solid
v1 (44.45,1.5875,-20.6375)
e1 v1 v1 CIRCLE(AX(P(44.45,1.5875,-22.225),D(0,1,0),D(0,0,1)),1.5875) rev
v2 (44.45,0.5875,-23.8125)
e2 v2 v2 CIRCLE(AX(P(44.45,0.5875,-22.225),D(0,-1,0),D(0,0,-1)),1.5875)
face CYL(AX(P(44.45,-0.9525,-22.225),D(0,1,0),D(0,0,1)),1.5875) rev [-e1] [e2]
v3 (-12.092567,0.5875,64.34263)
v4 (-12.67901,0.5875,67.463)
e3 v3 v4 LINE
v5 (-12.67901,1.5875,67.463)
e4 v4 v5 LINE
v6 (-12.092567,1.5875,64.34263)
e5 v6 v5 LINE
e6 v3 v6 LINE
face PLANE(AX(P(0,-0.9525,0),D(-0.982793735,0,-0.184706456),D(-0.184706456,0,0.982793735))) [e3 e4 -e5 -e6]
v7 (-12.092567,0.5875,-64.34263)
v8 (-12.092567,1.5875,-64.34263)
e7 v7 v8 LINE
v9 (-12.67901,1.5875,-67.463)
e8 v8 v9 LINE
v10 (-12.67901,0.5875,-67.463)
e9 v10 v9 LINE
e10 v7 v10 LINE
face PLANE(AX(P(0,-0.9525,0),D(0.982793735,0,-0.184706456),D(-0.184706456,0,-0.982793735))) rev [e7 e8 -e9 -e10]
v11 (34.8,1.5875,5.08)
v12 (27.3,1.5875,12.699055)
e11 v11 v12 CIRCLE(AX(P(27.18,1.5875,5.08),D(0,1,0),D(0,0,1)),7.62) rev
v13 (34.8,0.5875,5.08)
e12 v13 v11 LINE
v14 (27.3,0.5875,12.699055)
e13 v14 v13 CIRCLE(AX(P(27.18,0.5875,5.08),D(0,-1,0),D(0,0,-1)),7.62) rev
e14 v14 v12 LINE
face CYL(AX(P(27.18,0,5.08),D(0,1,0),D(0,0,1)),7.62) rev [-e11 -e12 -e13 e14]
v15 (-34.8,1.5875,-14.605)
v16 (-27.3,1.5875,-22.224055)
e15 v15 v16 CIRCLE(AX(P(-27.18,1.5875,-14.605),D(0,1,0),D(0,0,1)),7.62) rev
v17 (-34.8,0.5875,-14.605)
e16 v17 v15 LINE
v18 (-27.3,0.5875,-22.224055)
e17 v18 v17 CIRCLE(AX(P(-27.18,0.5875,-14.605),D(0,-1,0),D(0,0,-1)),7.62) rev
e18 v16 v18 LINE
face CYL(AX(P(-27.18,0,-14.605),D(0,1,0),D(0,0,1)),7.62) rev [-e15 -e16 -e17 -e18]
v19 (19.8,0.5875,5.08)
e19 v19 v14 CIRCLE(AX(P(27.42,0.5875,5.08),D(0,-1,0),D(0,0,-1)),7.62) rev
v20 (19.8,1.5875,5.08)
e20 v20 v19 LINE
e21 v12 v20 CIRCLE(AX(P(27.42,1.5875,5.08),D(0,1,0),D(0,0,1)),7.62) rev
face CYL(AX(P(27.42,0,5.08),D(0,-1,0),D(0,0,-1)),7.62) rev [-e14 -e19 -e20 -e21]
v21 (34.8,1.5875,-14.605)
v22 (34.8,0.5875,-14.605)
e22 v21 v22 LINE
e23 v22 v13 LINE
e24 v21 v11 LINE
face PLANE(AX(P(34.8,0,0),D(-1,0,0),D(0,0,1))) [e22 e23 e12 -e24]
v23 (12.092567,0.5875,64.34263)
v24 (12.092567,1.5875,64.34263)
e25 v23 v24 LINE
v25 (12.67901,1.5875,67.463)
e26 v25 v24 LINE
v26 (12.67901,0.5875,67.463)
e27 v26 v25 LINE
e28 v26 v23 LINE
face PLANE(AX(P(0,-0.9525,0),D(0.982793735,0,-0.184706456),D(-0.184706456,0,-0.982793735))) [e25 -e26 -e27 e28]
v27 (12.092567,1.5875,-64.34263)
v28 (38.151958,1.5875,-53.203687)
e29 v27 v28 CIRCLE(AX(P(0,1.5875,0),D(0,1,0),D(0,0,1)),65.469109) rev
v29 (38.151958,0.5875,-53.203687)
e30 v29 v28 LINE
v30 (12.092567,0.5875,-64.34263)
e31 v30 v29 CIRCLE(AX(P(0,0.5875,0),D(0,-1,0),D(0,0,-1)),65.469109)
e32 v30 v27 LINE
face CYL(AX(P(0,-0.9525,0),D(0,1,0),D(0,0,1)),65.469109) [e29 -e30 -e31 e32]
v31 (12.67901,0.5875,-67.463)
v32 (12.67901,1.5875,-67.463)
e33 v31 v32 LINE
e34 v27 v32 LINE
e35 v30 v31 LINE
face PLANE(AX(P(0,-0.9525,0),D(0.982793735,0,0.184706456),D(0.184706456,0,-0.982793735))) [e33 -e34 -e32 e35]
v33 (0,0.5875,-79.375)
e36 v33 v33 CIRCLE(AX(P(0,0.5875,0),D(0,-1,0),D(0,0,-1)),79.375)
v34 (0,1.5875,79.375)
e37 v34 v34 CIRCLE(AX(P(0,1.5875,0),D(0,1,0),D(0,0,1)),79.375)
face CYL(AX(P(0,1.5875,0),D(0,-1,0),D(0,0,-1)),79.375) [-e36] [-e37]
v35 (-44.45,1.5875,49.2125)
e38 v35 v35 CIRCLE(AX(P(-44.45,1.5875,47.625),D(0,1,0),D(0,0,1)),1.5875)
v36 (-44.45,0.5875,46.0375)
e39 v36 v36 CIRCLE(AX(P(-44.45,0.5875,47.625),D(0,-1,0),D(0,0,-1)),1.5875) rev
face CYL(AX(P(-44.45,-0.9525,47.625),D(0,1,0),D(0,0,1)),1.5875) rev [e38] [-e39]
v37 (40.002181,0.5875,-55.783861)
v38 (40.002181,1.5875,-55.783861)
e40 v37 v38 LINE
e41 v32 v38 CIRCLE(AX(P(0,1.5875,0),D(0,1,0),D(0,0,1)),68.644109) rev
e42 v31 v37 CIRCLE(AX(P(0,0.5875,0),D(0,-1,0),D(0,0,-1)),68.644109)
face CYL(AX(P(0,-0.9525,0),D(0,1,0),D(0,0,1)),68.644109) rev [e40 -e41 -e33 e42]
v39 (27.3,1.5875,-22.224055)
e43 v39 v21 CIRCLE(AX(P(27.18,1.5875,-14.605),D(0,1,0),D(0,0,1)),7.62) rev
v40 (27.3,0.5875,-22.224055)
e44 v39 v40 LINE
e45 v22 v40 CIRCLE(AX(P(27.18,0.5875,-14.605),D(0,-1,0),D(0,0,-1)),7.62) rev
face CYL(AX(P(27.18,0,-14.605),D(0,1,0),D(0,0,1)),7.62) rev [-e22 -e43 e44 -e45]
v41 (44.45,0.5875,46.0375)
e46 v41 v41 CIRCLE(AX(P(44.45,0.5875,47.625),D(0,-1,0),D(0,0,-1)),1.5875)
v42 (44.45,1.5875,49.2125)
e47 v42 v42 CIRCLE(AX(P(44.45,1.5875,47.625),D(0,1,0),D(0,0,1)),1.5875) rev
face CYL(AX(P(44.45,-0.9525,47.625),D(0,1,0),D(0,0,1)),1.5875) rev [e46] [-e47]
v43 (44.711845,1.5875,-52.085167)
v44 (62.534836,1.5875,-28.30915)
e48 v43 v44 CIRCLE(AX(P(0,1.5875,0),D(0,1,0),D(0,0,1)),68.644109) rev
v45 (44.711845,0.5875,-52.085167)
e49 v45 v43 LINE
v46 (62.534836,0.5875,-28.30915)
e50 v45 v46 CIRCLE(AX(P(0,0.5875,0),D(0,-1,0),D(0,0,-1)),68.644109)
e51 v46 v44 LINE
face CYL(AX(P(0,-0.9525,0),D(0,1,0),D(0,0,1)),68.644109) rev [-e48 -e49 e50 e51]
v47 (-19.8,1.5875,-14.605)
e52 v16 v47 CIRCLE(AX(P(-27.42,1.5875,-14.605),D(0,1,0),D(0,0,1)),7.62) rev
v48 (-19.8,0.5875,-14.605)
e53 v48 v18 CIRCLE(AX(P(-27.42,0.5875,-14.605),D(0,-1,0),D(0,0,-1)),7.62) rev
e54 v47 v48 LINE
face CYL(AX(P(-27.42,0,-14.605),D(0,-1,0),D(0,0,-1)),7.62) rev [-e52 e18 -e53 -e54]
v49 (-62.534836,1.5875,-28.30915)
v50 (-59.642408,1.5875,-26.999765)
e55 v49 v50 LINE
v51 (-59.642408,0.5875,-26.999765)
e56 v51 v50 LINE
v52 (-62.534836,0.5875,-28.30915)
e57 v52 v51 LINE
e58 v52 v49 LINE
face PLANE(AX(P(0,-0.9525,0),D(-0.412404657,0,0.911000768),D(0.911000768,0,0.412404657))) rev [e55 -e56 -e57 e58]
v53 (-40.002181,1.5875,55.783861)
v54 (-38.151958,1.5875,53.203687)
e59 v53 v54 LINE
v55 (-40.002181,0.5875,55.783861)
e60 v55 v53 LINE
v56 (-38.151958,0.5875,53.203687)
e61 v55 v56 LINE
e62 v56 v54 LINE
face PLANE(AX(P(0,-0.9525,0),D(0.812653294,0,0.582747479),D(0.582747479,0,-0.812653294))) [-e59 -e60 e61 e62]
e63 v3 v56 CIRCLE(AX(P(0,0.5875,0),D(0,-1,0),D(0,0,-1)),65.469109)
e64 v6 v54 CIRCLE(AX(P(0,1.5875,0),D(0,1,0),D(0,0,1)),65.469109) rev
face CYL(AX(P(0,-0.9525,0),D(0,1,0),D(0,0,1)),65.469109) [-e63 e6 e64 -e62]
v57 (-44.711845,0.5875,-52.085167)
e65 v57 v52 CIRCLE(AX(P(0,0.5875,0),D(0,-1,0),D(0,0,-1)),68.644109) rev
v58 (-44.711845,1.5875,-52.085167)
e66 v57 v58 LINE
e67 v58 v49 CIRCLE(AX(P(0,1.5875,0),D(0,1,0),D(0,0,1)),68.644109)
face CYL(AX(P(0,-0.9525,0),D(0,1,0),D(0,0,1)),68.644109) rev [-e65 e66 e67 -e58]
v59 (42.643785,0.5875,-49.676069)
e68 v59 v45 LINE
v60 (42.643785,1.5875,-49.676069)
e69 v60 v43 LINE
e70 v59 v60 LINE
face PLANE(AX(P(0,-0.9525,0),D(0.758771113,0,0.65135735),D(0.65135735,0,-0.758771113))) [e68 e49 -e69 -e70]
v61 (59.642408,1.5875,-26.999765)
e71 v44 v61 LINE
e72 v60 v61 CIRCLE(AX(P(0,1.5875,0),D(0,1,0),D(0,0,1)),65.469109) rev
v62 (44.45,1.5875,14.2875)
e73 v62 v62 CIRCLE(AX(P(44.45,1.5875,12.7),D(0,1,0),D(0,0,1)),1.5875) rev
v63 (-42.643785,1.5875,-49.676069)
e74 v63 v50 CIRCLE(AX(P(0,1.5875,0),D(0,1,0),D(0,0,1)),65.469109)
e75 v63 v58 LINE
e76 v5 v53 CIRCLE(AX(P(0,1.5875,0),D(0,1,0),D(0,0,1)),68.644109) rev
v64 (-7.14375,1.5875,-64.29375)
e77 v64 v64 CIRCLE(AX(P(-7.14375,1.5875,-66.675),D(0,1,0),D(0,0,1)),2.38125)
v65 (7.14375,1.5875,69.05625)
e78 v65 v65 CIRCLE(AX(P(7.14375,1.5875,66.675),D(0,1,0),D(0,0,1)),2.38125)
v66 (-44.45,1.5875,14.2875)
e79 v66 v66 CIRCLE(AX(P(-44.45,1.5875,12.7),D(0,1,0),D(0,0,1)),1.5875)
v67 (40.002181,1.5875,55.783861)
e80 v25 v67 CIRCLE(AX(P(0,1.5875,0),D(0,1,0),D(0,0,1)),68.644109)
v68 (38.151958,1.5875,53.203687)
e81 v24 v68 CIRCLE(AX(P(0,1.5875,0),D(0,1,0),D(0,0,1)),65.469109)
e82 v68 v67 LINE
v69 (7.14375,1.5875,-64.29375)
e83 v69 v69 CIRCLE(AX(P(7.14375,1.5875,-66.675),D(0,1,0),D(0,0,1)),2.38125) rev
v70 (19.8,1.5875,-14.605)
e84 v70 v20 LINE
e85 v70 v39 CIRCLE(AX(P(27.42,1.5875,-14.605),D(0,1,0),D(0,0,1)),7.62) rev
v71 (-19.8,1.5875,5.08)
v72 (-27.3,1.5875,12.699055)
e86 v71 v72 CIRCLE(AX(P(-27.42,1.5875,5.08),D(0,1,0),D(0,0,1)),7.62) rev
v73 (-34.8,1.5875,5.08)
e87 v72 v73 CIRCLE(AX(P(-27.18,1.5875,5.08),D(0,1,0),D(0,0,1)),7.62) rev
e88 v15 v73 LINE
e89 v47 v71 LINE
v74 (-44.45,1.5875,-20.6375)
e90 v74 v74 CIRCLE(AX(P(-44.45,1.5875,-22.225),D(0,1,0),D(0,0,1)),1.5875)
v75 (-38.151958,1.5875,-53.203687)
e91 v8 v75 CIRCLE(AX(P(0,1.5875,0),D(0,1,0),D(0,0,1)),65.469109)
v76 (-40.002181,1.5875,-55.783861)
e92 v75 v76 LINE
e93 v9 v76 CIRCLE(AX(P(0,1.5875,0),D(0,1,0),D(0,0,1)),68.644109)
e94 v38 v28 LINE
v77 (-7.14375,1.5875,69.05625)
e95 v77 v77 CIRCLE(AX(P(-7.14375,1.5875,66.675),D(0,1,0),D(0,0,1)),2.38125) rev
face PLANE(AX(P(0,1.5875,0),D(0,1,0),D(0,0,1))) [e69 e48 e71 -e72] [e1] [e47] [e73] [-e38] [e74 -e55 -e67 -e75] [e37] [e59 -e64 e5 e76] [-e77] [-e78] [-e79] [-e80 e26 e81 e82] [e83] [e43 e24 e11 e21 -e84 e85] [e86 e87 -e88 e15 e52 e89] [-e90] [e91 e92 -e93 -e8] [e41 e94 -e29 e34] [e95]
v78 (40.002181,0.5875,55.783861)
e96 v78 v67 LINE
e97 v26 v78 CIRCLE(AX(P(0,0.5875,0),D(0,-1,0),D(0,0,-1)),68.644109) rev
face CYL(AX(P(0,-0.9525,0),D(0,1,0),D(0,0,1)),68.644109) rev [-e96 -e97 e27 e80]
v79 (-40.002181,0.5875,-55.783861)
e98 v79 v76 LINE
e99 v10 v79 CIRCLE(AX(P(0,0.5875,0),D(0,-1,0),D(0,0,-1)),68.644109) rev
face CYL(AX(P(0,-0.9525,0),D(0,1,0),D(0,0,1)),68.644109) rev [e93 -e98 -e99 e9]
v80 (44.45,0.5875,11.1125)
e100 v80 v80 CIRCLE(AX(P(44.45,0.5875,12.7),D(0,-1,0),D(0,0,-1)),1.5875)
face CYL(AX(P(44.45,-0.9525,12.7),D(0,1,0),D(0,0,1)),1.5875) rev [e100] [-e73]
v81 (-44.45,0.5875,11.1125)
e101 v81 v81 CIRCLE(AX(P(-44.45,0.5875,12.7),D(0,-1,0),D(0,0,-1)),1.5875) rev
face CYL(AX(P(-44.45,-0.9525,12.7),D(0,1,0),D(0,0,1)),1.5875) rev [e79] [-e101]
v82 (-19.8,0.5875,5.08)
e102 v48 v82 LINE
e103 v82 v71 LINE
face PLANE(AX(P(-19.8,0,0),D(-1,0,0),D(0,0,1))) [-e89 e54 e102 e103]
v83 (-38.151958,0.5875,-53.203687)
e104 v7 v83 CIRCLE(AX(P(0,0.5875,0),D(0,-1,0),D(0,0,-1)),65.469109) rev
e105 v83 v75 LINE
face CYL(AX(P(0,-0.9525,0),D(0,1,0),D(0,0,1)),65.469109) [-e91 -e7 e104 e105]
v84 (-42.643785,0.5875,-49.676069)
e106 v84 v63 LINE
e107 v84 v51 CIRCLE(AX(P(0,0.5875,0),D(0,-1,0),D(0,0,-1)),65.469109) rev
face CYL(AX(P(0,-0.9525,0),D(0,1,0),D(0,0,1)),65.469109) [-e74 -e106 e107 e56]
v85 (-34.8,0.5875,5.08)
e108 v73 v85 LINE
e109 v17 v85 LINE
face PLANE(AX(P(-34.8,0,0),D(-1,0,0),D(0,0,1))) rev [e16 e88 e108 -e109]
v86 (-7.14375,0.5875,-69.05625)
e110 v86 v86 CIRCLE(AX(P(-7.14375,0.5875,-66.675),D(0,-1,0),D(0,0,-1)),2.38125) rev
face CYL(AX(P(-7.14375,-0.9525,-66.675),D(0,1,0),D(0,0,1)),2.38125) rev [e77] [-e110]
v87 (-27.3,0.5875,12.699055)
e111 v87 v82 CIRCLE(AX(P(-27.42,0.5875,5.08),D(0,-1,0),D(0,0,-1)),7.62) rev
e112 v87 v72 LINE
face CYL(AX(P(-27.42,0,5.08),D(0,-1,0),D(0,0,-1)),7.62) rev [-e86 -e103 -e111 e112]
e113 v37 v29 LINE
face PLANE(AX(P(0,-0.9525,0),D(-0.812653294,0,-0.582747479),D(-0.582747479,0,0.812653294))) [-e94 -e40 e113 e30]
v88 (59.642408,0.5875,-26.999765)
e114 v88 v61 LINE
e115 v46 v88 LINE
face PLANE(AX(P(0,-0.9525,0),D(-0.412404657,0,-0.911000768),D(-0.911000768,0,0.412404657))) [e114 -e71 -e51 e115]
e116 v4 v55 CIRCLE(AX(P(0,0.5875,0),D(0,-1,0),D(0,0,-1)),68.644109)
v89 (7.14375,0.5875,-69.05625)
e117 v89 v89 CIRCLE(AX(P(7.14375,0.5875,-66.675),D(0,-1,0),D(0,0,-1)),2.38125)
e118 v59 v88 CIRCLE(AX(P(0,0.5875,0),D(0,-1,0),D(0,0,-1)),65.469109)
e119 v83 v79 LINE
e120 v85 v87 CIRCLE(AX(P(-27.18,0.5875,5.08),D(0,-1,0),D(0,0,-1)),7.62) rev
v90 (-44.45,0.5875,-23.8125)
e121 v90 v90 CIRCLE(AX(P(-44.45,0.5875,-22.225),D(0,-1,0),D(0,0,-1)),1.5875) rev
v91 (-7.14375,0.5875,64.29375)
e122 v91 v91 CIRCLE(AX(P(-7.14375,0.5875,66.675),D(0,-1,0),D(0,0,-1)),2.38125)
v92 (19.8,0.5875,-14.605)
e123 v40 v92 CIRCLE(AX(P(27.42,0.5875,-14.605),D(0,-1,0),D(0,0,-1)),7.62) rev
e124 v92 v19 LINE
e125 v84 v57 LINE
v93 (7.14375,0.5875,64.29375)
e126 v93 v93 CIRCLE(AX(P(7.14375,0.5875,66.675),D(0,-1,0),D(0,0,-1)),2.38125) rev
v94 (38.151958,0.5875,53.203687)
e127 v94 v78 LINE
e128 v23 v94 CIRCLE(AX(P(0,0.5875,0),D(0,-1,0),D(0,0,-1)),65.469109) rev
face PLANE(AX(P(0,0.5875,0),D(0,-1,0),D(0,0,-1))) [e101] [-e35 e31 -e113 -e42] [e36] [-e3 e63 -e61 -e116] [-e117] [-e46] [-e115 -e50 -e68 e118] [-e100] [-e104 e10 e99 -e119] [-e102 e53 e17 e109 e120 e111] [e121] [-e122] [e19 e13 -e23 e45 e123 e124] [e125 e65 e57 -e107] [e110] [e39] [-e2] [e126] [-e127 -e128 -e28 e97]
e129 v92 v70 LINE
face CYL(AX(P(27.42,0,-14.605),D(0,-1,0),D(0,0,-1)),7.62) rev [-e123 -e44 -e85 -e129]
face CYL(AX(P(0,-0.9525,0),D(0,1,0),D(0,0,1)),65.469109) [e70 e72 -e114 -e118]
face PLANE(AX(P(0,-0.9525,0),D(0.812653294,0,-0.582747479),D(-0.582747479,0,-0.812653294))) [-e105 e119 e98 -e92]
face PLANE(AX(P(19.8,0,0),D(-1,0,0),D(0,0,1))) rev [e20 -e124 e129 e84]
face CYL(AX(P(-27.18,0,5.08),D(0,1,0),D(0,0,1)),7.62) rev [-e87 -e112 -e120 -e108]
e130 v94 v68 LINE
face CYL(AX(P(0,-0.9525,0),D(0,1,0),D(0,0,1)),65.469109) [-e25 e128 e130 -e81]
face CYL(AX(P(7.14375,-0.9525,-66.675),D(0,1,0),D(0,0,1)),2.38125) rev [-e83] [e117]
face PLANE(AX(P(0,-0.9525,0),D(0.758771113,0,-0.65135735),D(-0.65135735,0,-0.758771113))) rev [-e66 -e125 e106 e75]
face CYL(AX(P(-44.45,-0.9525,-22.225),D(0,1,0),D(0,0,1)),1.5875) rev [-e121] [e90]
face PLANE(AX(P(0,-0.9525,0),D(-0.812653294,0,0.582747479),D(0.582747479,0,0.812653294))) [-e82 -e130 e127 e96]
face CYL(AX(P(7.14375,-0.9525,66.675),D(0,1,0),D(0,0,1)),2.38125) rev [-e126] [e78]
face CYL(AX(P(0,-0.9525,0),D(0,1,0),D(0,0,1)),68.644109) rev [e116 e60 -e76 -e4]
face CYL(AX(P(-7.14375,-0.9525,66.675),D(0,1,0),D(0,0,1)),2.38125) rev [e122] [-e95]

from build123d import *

# Parameters (mm, degrees)
SKETCH1_R           = 1.5875
BOSS_EXTRUDE5_DEPTH = 1.5875
FILLET2_R           = 2.54
FILLET3_R           = 2.54
FILLET4_R           = 5.08
CUT_EXTRUDE1_START  = -2.54
SKETCH2_R           = 2.38125
SKETCH2_R_2         = 1.5875
CUT_EXTRUDE1_DEPTH  = 2.54
SKETCH3_R           = 1.5875
CUT_EXTRUDE2_DEPTH  = 2.54
CUT_EXTRUDE3_DEPTH  = 2.54
SKETCH5_W           = 15
SKETCH5_H           = 34.925
CUT_EXTRUDE4_DEPTH  = 109.650407999
FILLET5_R           = 7.62
FILLET6_R           = 7.62
BOSS_EXTRUDE6_START = -1.5875
BOSS_EXTRUDE6_DEPTH = 1.5875
SKETCH7_R           = 79.375
CUT_EXTRUDE5_DEPTH  = 0.5875


with BuildPart() as part:
    # Sketch1 → Boss-Extrude5 (new body)
    with BuildSketch(Plane(origin=(0, 0, 0), x_dir=(1, 0, 0), z_dir=(0, 1, 0))):
        with BuildLine():
            ThreePointArc((-63.5, -47.625), (-35.497579143, -70.995158286), (0, -79.375))
            ThreePointArc((0, -79.375), (35.497579143, -70.995158286), (63.5, -47.625))
            Line((63.5, -47.625), (50.8, -47.625))
            Line((50.8, -47.625), (50.8, 22.225))
            Line((50.8, 22.225), (76.2, 22.225))
            ThreePointArc((76.2, 22.225), (0, 79.375), (-76.2, 22.225))
            Line((-76.2, 22.225), (-50.8, 22.225))
            Line((-50.8, 22.225), (-50.8, -47.625))
            Line((-50.8, -47.625), (-63.5, -47.625))
        make_face()
        with Locations(Location((-7.14375, -66.675, 0), (0, 0, 270))):
            Circle(SKETCH1_R, mode=Mode.SUBTRACT)
        with BuildLine():
            ThreePointArc((8.73125, -66.675), (7.14375, -68.2625), (5.55625, -66.675))
            ThreePointArc((5.55625, -66.675), (7.14375, -65.0875), (8.73125, -66.675))
        make_face(mode=Mode.SUBTRACT)
        with Locations(Location((-7.14375, 66.675, 0), (0, 0, 270))):
            Circle(SKETCH1_R, mode=Mode.SUBTRACT)
        with Locations(Location((7.14375, 66.675, 0), (0, 0, 270))):
            Circle(SKETCH1_R, mode=Mode.SUBTRACT)
    extrude(amount=BOSS_EXTRUDE5_DEPTH)

    # Fillet2
    fillet2_edges = [part.edges().sort_by_distance(p)[0] for p in [
        (-63.5, 0.79375, 47.625),
    ]]
    fillet(fillet2_edges, radius=FILLET2_R)

    # Fillet3
    fillet3_edges = [part.edges().sort_by_distance(p)[0] for p in [
        (63.5, 0.79375, 47.625),
    ]]
    fillet(fillet3_edges, radius=FILLET3_R)

    # Fillet4
    fillet4_edges = [part.edges().sort_by_distance(p)[0] for p in [
        (-76.2, 0.79375, -22.225),
        (76.2, 0.79375, -22.225),
    ]]
    fillet(fillet4_edges, radius=FILLET4_R)

    # Sketch2 → Cut-Extrude1 (cut)
    # profile 1 of 10: a face of its own
    with BuildSketch(Plane(origin=(0, 1.5875, 0), x_dir=(1, 0, 0), z_dir=(0, 1, 0)).offset(CUT_EXTRUDE1_START)):
        with BuildLine():
            Line((-61.088622125, 27.654457796), (-59.642408406, 26.999765402))
            ThreePointArc((-59.642408406, 26.999765402), (-52.384826382, 39.268743005), (-42.643785254, 49.676068599))
            Line((-42.643785254, 49.676068599), (-43.677815048, 50.880617741))
            Line((-43.677815048, 50.880617741), (-44.711844841, 52.085166883))
            ThreePointArc((-44.711844841, 52.085166883), (-54.925289002, 41.173126022), (-62.534835843, 28.309150189))
            Line((-62.534835843, 28.309150189), (-61.088622125, 27.654457796))
        make_face()
    # profile 2 of 10: a face of its own
    with BuildSketch(Plane(origin=(0, 1.5875, 0), x_dir=(1, 0, 0), z_dir=(0, 1, 0)).offset(CUT_EXTRUDE1_START)):
        with BuildLine():
            Line((-39.077069744, 54.493774041), (-38.151958122, 53.203686937))
            ThreePointArc((-38.151958122, 53.203686937), (-25.732218917, 60.200142208), (-12.092567045, 64.342629994))
            Line((-12.092567045, 64.342629994), (-12.385788543, 65.902815048))
            Line((-12.385788543, 65.902815048), (-12.679010041, 67.463000102))
            ThreePointArc((-12.679010041, 67.463000102), (-26.980132574, 63.119617589), (-40.002181367, 55.783861145))
            Line((-40.002181367, 55.783861145), (-39.077069744, 54.493774041))
        make_face()
    # profile 3 of 10: a face of its own
    with BuildSketch(Plane(origin=(0, 1.5875, 0), x_dir=(1, 0, 0), z_dir=(0, 1, 0)).offset(CUT_EXTRUDE1_START)):
        with Locations(Location((-7.14375, 66.675, 0), (0, 0, 270))):
            Circle(SKETCH2_R)
        with Locations((-7.14375, 66.675)):
            Circle(SKETCH2_R_2, mode=Mode.SUBTRACT)
    # profile 4 of 10: a face of its own
    with BuildSketch(Plane(origin=(0, 1.5875, 0), x_dir=(1, 0, 0), z_dir=(0, 1, 0)).offset(CUT_EXTRUDE1_START)):
        with Locations(Location((7.14375, 66.675, 0), (0, 0, 270))):
            Circle(SKETCH2_R)
        with Locations((7.14375, 66.675)):
            Circle(SKETCH2_R_2, mode=Mode.SUBTRACT)
    # profile 5 of 10: a face of its own
    with BuildSketch(Plane(origin=(0, 1.5875, 0), x_dir=(1, 0, 0), z_dir=(0, 1, 0)).offset(CUT_EXTRUDE1_START)):
        with BuildLine():
            ThreePointArc((12.679010041, 67.463000102), (26.980132574, 63.119617589), (40.002181367, 55.783861145))
            Line((40.002181367, 55.783861145), (39.077069744, 54.493774041))
            Line((39.077069744, 54.493774041), (38.151958122, 53.203686937))
            ThreePointArc((38.151958122, 53.203686937), (25.732218917, 60.200142208), (12.092567045, 64.342629994))
            Line((12.092567045, 64.342629994), (12.385788543, 65.902815048))
            Line((12.385788543, 65.902815048), (12.679010041, 67.463000102))
        make_face()
    # profile 6 of 10: a face of its own
    with BuildSketch(Plane(origin=(0, 1.5875, 0), x_dir=(1, 0, 0), z_dir=(0, 1, 0)).offset(CUT_EXTRUDE1_START)):
        with BuildLine():
            ThreePointArc((44.711844841, 52.085166883), (54.925289002, 41.173126022), (62.534835843, 28.309150189))
            Line((62.534835843, 28.309150189), (59.642408406, 26.999765402))
            ThreePointArc((59.642408406, 26.999765402), (52.384826382, 39.268743005), (42.643785254, 49.676068599))
            Line((42.643785254, 49.676068599), (43.677815048, 50.880617741))
            Line((43.677815048, 50.880617741), (44.711844841, 52.085166883))
        make_face()
    # profile 7 of 10: a face of its own
    with BuildSketch(Plane(origin=(0, 1.5875, 0), x_dir=(1, 0, 0), z_dir=(0, 1, 0)).offset(CUT_EXTRUDE1_START)):
        with BuildLine():
            ThreePointArc((-12.679010041, -67.463000102), (-26.980132574, -63.119617589), (-40.002181367, -55.783861145))
            Line((-40.002181367, -55.783861145), (-39.077069744, -54.493774041))
            Line((-39.077069744, -54.493774041), (-38.151958122, -53.203686937))
            ThreePointArc((-38.151958122, -53.203686937), (-25.732218917, -60.200142208), (-12.092567045, -64.342629994))
            Line((-12.092567045, -64.342629994), (-12.385788543, -65.902815048))
            Line((-12.385788543, -65.902815048), (-12.679010041, -67.463000102))
        make_face()
    # profile 8 of 10: a face of its own
    with BuildSketch(Plane(origin=(0, 1.5875, 0), x_dir=(1, 0, 0), z_dir=(0, 1, 0)).offset(CUT_EXTRUDE1_START)):
        with Locations(Location((-7.14375, -66.675, 0), (0, 0, 270))):
            Circle(SKETCH2_R)
        with Locations((-7.14375, -66.675)):
            Circle(SKETCH2_R_2, mode=Mode.SUBTRACT)
    # profile 9 of 10: a face of its own
    with BuildSketch(Plane(origin=(0, 1.5875, 0), x_dir=(1, 0, 0), z_dir=(0, 1, 0)).offset(CUT_EXTRUDE1_START)):
        with Locations(Location((7.14375, -66.675, 0), (0, 0, 270))):
            Circle(SKETCH2_R)
        with Locations((7.14375, -66.675)):
            Circle(SKETCH2_R_2, mode=Mode.SUBTRACT)
    # profile 10 of 10: a face of its own
    with BuildSketch(Plane(origin=(0, 1.5875, 0), x_dir=(1, 0, 0), z_dir=(0, 1, 0)).offset(CUT_EXTRUDE1_START)):
        with BuildLine():
            ThreePointArc((12.092567045, -64.342629994), (25.732218917, -60.200142208), (38.151958122, -53.203686937))
            Line((38.151958122, -53.203686937), (39.077069744, -54.493774041))
            Line((39.077069744, -54.493774041), (40.002181367, -55.783861145))
            ThreePointArc((40.002181367, -55.783861145), (26.980132574, -63.119617589), (12.679010041, -67.463000102))
            Line((12.679010041, -67.463000102), (12.385788543, -65.902815048))
            Line((12.385788543, -65.902815048), (12.092567045, -64.342629994))
        make_face()
    extrude(amount=CUT_EXTRUDE1_DEPTH, mode=Mode.SUBTRACT)

    # Sketch3 → Cut-Extrude2 (cut)
    with BuildSketch(Plane(origin=(0, 1.5875, 0), x_dir=(1, 0, 0), z_dir=(0, 1, 0))):
        with Locations(Location((-44.45, -47.625, 0), (0, 0, 270))):
            Circle(SKETCH3_R)
        with Locations(Location((-44.45, 22.225, 0), (0, 0, 270))):
            Circle(SKETCH3_R)
        with Locations(Location((44.45, 22.225, 0), (0, 0, 270))):
            Circle(SKETCH3_R)
        with Locations(Location((44.45, -47.625, 0), (0, 0, 270))):
            Circle(SKETCH3_R)
    extrude(amount=-CUT_EXTRUDE2_DEPTH, mode=Mode.SUBTRACT)

    # Sketch4 → Cut-Extrude3 (cut)
    with BuildSketch(Plane(origin=(0, 1.5875, 0), x_dir=(1, 0, 0), z_dir=(0, 1, 0))):
        with BuildLine():
            ThreePointArc((-44.45, -11.1125), (-46.0375, -12.7), (-44.45, -14.2875))
            Line((-44.45, -14.2875), (-44.45, -11.1125))
        make_face()
        with BuildLine():
            Line((-44.45, -11.1125), (-44.45, -14.2875))
            ThreePointArc((-44.45, -14.2875), (-43.327467985, -13.822532015), (-42.8625, -12.7))
            ThreePointArc((-42.8625, -12.7), (-43.327467985, -11.577467985), (-44.45, -11.1125))
        make_face()
        with BuildLine():
            ThreePointArc((44.45, -11.1125), (42.8625, -12.7), (44.45, -14.2875))
            Line((44.45, -14.2875), (44.45, -11.1125))
        make_face()
        with BuildLine():
            Line((44.45, -11.1125), (44.45, -14.2875))
            ThreePointArc((44.45, -14.2875), (45.572532015, -13.822532015), (46.0375, -12.7))
            ThreePointArc((46.0375, -12.7), (45.572532015, -11.577467985), (44.45, -11.1125))
        make_face()
    extrude(amount=-CUT_EXTRUDE3_DEPTH, mode=Mode.SUBTRACT)

    # Sketch5 → Cut-Extrude4 (cut, through all)
    with BuildSketch(Plane(origin=(0, 1.5875, 0), x_dir=(1, 0, 0), z_dir=(0, 1, 0))):
        with Locations((-27.3, 4.7625)):
            Rectangle(SKETCH5_W, SKETCH5_H)
        with Locations((27.3, 4.7625)):
            Rectangle(SKETCH5_W, SKETCH5_H)
    extrude(amount=-CUT_EXTRUDE4_DEPTH, mode=Mode.SUBTRACT)

    # Fillet5
    # the kernel refuses this fillet: 7.62 mm, written as the material it adds along each edge
    with BuildSketch(Plane(origin=(-19.8, 1.5875, 12.7), x_dir=(0, 0, -1), z_dir=(0, -1, 0))) as fillet5_piece_1:
        with BuildLine():
            CenterArc((FILLET5_R, -FILLET5_R), FILLET5_R, 90, 90)
            Line((0, -FILLET5_R), (0, 0))
            Line((0, 0), (FILLET5_R, 0))
        make_face()
    extrude(amount=1.5875)
    with BuildSketch(Plane(origin=(-34.8, 1.5875, 12.7), x_dir=(0, 0, -1), z_dir=(0, -1, 0)), Plane(origin=(-19.8, 1.5875, -22.225), x_dir=(0, 0, 1), z_dir=(0, -1, 0)), Plane(origin=(-34.8, 1.5875, -22.225), x_dir=(1, 0, 0), z_dir=(0, -1, 0))) as fillet5_piece_2:
        with BuildLine():
            CenterArc((FILLET5_R, FILLET5_R), FILLET5_R, 180, 90)
            Line((0, FILLET5_R), (0, 0))
            Line((0, 0), (FILLET5_R, 0))
        make_face()
    extrude(amount=1.5875)

    # Fillet6
    # the kernel refuses this fillet: 7.62 mm, written as the material it adds along each edge
    with BuildSketch(Plane(origin=(34.8, 1.5875, 12.7), x_dir=(0, 0, -1), z_dir=(0, -1, 0)), Plane(origin=(34.8, 1.5875, -22.225), x_dir=(-1, 0, 0), z_dir=(0, -1, 0))) as fillet6_piece_1:
        with BuildLine():
            CenterArc((FILLET6_R, -FILLET6_R), FILLET6_R, 90, 90)
            Line((0, -FILLET6_R), (0, 0))
            Line((0, 0), (FILLET6_R, 0))
        make_face()
    extrude(amount=1.5875)
    with BuildSketch(Plane(origin=(19.8, 1.5875, -22.225), x_dir=(1, 0, 0), z_dir=(0, -1, 0)), Plane(origin=(19.8, 1.5875, 12.7), x_dir=(0, 0, -1), z_dir=(0, -1, 0))) as fillet6_piece_2:
        with BuildLine():
            CenterArc((FILLET6_R, FILLET6_R), FILLET6_R, 180, 90)
            Line((0, FILLET6_R), (0, 0))
            Line((0, 0), (FILLET6_R, 0))
        make_face()
    extrude(amount=1.5875)

    # Sketch6 → Boss-Extrude6 (add)
    with BuildSketch(Plane(origin=(0, 1.5875, 0), x_dir=(1, 0, 0), z_dir=(0, 1, 0)).offset(BOSS_EXTRUDE6_START)):
        with BuildLine():
            Line((-50.8, -60.989758362), (-50.8, 22.225))
            Line((-50.8, 22.225), (-69.095470184, 22.225))
            Line((-69.095470184, 22.225), (-69.095470184, 39.066694575))
            ThreePointArc((-69.095470184, 39.066694575), (-78.080435361, -14.277122916), (-50.8, -60.989758362))
        make_face()
        with BuildLine():
            Line((50.8, 22.225), (50.8, -60.989758362))
            ThreePointArc((50.8, -60.989758362), (71.877119534, -33.675960454), (79.375, 0))
            ThreePointArc((79.375, 0), (76.762111653, 20.198238526), (69.095470184, 39.066694575))
            Line((69.095470184, 39.066694575), (69.095470184, 22.225))
            Line((69.095470184, 22.225), (50.8, 22.225))
        make_face()
    extrude(amount=BOSS_EXTRUDE6_DEPTH)

    # Sketch7 → Cut-Extrude5 (cut)
    with BuildSketch(Plane.XZ):
        with Locations(Location((0, 0, 0), (0, 0, 270))):
            Circle(SKETCH7_R)
    extrude(amount=-CUT_EXTRUDE5_DEPTH, mode=Mode.SUBTRACT)


solid = part.part
